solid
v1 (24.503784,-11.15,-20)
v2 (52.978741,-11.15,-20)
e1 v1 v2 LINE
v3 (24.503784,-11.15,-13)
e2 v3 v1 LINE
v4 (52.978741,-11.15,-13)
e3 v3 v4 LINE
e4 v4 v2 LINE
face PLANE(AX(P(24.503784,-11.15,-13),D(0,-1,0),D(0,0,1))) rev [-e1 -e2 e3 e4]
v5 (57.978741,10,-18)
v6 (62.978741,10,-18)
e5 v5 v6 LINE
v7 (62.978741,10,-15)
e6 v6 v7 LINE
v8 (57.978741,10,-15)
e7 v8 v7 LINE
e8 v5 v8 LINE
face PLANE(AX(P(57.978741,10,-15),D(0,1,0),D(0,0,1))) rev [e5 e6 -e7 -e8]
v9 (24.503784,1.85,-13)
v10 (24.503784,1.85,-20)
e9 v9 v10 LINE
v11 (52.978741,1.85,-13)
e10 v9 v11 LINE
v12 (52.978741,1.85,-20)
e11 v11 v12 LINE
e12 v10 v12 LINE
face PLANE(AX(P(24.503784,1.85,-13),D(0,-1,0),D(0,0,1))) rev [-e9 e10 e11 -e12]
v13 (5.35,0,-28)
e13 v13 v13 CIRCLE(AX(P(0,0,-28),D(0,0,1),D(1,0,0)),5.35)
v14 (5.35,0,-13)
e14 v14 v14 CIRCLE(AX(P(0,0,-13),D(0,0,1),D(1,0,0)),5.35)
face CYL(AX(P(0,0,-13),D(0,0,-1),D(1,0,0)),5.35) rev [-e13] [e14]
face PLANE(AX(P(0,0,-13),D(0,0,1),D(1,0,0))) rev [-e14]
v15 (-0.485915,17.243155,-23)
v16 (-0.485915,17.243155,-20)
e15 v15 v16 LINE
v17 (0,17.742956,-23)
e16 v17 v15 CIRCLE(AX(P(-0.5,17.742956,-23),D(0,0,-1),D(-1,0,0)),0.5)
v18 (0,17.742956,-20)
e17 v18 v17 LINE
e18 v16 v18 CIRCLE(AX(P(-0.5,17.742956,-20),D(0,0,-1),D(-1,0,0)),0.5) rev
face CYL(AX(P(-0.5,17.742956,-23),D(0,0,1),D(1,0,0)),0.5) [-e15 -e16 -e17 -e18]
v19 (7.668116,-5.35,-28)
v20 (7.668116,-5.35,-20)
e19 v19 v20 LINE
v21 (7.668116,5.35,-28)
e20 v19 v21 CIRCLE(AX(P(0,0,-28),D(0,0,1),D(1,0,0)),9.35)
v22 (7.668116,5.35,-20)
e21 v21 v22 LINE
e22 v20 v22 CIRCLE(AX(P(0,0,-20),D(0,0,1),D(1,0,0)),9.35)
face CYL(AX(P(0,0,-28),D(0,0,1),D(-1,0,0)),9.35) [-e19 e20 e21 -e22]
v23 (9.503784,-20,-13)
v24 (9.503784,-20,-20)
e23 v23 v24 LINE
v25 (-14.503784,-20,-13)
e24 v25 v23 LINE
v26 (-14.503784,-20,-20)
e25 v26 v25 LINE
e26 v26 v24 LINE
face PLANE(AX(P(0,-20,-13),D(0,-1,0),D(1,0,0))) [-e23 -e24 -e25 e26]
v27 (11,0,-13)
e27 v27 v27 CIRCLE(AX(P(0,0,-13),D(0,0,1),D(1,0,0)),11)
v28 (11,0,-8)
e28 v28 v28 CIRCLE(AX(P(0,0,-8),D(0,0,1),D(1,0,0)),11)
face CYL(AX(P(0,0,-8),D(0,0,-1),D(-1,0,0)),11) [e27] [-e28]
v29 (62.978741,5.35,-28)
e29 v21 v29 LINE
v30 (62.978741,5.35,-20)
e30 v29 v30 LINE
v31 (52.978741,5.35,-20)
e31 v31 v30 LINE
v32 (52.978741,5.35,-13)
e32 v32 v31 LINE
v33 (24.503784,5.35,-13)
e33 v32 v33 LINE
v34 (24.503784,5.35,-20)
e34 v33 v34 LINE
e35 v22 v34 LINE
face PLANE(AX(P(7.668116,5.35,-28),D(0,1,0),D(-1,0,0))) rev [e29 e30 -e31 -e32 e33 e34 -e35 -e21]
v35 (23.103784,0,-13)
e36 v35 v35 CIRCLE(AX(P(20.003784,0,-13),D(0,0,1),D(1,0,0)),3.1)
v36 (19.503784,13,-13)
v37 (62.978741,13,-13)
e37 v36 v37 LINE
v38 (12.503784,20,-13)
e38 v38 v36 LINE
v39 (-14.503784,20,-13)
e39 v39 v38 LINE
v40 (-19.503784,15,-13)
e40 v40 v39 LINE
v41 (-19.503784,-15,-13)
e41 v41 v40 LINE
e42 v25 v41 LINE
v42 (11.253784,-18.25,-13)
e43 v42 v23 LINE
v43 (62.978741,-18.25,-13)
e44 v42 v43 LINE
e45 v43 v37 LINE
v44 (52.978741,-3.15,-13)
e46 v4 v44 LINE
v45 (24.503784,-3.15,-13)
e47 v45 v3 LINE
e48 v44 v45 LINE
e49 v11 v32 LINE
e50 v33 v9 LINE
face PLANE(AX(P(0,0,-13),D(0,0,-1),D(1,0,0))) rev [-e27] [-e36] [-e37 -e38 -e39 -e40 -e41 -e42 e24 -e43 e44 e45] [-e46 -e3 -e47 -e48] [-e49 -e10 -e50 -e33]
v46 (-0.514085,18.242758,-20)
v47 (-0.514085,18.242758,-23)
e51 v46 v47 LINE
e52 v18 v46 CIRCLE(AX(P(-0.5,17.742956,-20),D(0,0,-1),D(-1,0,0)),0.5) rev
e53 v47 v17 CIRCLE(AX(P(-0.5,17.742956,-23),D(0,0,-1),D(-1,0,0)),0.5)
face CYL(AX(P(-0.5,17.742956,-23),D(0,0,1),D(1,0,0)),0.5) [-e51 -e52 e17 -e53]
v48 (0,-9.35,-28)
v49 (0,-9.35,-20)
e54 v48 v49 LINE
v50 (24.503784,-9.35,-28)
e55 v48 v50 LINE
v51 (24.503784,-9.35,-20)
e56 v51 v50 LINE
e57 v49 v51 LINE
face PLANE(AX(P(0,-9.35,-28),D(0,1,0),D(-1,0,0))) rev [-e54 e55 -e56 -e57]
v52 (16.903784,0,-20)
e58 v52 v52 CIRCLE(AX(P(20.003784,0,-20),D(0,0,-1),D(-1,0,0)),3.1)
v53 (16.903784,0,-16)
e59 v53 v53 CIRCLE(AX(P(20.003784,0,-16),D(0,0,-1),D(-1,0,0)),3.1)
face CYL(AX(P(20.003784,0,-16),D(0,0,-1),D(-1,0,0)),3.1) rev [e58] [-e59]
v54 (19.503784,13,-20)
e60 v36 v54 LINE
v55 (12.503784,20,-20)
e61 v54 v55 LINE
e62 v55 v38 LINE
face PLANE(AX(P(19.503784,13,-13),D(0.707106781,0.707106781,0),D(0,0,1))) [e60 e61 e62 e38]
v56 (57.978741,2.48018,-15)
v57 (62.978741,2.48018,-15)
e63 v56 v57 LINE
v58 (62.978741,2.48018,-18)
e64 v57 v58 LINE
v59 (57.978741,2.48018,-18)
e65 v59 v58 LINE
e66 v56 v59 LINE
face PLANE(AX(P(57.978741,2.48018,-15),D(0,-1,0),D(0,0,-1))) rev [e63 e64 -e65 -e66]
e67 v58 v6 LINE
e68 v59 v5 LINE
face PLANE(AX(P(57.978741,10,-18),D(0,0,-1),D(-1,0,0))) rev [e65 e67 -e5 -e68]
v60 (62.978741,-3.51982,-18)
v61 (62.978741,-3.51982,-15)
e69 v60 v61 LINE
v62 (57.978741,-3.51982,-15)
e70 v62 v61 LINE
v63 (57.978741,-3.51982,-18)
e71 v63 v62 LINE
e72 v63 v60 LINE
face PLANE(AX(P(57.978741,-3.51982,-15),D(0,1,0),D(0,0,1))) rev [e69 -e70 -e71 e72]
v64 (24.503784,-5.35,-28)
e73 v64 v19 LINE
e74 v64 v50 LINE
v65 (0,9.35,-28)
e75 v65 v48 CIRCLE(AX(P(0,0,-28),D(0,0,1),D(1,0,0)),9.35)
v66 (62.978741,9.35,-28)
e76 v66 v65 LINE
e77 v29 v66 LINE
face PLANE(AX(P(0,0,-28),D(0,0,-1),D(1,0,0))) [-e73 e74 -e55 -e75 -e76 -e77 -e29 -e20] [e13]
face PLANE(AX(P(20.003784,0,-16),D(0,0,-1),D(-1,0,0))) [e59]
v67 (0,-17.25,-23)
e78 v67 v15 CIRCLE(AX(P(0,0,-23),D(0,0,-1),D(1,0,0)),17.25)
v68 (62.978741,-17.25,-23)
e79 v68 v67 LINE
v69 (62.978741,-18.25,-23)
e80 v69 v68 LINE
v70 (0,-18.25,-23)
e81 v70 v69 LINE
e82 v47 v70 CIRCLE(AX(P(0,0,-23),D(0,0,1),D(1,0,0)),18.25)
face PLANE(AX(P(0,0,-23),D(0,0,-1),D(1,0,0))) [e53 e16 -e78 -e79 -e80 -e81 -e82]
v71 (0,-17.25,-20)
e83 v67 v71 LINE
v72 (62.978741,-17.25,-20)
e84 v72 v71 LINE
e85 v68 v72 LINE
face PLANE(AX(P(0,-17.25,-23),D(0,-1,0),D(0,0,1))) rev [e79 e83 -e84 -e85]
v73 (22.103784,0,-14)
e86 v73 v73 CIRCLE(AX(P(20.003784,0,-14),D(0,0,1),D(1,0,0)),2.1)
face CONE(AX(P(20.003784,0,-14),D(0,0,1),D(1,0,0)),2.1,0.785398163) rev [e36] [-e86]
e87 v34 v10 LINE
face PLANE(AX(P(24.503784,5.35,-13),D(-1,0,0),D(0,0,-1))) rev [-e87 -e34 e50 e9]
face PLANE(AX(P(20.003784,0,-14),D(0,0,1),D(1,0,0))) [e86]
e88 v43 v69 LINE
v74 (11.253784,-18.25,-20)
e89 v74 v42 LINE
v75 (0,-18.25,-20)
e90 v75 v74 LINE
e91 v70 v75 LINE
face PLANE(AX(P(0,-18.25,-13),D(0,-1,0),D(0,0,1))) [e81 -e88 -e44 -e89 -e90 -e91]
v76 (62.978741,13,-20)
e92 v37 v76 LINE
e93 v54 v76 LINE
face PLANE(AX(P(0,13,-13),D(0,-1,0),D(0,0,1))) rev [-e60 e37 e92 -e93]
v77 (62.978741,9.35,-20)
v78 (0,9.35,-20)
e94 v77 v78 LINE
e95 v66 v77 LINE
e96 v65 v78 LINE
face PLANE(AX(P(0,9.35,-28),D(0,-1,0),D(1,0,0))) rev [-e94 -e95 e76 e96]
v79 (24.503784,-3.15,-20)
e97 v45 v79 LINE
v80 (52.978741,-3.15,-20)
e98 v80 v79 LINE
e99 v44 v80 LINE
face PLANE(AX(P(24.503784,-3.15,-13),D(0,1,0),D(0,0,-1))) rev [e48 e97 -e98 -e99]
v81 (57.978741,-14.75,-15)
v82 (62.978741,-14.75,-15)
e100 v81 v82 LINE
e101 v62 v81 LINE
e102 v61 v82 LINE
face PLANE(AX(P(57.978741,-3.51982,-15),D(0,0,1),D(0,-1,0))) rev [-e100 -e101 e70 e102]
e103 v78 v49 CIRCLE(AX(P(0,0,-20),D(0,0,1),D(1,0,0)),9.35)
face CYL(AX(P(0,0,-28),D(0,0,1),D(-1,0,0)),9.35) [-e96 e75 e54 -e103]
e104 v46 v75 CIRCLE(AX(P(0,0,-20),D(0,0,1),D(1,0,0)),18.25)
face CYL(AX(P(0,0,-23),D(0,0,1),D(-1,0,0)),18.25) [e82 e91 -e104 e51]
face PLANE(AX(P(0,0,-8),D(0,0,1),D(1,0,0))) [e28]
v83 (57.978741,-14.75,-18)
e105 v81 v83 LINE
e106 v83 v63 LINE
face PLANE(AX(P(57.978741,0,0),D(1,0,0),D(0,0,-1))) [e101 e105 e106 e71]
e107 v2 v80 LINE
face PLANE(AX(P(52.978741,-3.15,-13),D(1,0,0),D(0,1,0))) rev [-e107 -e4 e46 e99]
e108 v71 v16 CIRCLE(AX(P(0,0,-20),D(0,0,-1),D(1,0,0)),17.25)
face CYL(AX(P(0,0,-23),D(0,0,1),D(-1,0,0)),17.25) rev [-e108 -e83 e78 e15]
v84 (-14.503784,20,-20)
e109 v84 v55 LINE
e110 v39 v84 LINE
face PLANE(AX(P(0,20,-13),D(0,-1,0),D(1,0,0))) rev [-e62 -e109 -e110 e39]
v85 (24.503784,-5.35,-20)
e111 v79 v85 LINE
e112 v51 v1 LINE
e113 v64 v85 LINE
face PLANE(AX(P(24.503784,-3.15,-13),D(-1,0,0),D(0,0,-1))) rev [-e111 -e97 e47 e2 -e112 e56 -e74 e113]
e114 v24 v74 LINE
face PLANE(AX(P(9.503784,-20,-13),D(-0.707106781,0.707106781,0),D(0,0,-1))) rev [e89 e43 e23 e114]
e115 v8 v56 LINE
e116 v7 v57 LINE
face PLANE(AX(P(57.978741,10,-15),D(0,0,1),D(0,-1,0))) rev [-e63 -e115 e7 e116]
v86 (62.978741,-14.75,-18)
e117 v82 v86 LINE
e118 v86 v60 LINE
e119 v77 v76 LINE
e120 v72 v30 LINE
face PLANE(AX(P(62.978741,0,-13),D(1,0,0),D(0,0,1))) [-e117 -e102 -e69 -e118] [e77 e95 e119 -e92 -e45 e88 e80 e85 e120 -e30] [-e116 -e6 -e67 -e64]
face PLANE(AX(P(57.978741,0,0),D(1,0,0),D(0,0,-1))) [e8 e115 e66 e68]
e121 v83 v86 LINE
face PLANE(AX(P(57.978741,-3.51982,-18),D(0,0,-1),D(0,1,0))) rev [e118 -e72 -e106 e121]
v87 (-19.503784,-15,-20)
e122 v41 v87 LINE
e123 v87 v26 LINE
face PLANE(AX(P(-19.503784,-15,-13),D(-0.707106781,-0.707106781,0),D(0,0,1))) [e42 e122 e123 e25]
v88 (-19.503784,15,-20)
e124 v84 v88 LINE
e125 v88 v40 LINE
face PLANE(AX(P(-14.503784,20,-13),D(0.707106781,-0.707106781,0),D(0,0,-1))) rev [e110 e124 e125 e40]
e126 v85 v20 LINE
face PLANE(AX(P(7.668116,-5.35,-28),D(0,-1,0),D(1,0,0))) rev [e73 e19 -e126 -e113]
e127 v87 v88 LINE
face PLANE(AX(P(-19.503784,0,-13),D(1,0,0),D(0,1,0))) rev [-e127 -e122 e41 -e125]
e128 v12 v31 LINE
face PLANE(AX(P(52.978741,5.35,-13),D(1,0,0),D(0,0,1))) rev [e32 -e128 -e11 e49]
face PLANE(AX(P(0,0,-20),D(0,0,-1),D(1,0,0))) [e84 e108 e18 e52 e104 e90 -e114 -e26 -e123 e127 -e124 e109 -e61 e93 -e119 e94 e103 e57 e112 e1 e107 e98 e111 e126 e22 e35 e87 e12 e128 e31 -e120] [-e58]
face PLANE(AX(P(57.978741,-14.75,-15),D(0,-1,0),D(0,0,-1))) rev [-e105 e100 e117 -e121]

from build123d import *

# Parameters (mm, degrees)
SKETCH1_R               = 5.35
BOSS_EXTRUDE2_DEPTH     = 7
BOSS_EXTRUDE3_START     = 8
SKETCH3_R               = 5.35
BOSS_EXTRUDE3_DEPTH     = 8
BOSS_EXTRUDE4_DEPTH     = 3
CHAMFER1_SIZE           = 10
CHAMFER2_SIZE           = 5
CUT_EXTRUDE1_DEPTH      = 67.560662475
CUT_EXTRUDE1_DEPTH_BACK = 67.560662475
SKETCH5_W               = 28.474956737
SKETCH5_H               = 3.5
SKETCH5_H_2             = 8
CHAMFER3_SIZE           = 7
SKETCH6_R               = 11
BOSS_EXTRUDE5_DEPTH     = 5
SKETCH8_W               = 3
SKETCH8_H               = 7.519820499
SKETCH8_H_2             = 11.230179501
CUT_EXTRUDE2_DEPTH      = 5
CUT_EXTRUDE3_REACH      = 91.372
SKETCH9_W               = 8
SKETCH9_H               = 4
SKETCH10_R              = 3.1
CUT_EXTRUDE4_DEPTH      = 4
SKETCH11_R              = 3.1
CUT_EXTRUDE5_DEPTH      = 1
CHAMFER4_SIZE           = 1
FILLET1_R               = 0.5


# Some blends are built 0.0001 mm under size
with BuildPart() as part:
    # Sketch1 → Boss-Extrude2 (new body)
    with BuildSketch(Plane.XY):
        Polygon((-19.503784034, -20), (19.503784034, -20), (19.503784034, -18.25), (62.978740771, -18.25), (62.978740771, 13), (19.503784034, 13), (19.503784034, 20), (-19.503784034, 20), align=None)
        Circle(SKETCH1_R, mode=Mode.SUBTRACT)
    extrude(amount=-BOSS_EXTRUDE2_DEPTH)

    # Sketch3 → Boss-Extrude3 (add)
    with BuildSketch(Plane.XY.offset(BOSS_EXTRUDE3_START)):
        with BuildLine():
            Line((7.668115805, 5.35), (62.978740771, 5.35))
            Line((62.978740771, 5.35), (62.978740771, 9.35))
            Line((62.978740771, 9.35), (0, 9.35))
            ThreePointArc((0, 9.35), (-9.35, 0), (0, -9.35))
            Line((0, -9.35), (62.978740771, -9.35))
            Line((62.978740771, -9.35), (62.978740771, -5.35))
            Line((62.978740771, -5.35), (7.668115805, -5.35))
            ThreePointArc((7.668115805, -5.35), (9.35, 0), (7.668115805, 5.35))
        make_face()
        Circle(SKETCH3_R, mode=Mode.SUBTRACT)
    extrude(amount=-BOSS_EXTRUDE3_DEPTH)

    # Sketch4 → Boss-Extrude4 (add)
    with BuildSketch(Plane.XY):
        with BuildLine():
            Line((0, -18.25), (62.978740771, -18.25))
            Line((62.978740771, -18.25), (62.978740771, -17.25))
            Line((62.978740771, -17.25), (8.306623863, -17.25))
            Line((8.306623863, -17.25), (0, -17.25))
            ThreePointArc((0, -17.25), (-17.25, 0), (0, 17.25))
            Line((0, 17.25), (0, 18.25))
            ThreePointArc((0, 18.25), (-18.25, 0), (0, -18.25))
        make_face()
    extrude(amount=BOSS_EXTRUDE4_DEPTH)

    # Chamfer1
    # the kernel refuses this chamfer: 10 mm, written as the material it takes off along each edge
    with BuildSketch(Plane(origin=(19.503784034, -20, 25.71682988), x_dir=(-0.9996219169112968, -0.027495876610586317, 0), z_dir=(0, 0, -1))) as chamfer1_piece_1_section:
        Polygon((CHAMFER1_SIZE * 0.999621916911, CHAMFER1_SIZE * 0.0274958766106), (-CHAMFER1_SIZE * 0.0274958766106, CHAMFER1_SIZE * 0.999621916911), (0, 0), align=None)
    chamfer1_piece_1 = extrude(amount=58.433659759, mode=Mode.PRIVATE)
    chamfer1_piece_1 = split(chamfer1_piece_1, bisect_by=Plane(origin=(14.814200223, -18.25, -3.5), z_dir=(0, -1, 0)), keep=Keep.TOP, mode=Mode.PRIVATE)
    add(chamfer1_piece_1, mode=Mode.SUBTRACT)

    # Chamfer2
    chamfer2_edges = [part.edges().sort_by_distance(p)[0] for p in [
        (-19.503784034, -20, -3.5),
        (-19.503784034, 20, -3.5),
    ]]
    chamfer(chamfer2_edges, length=CHAMFER2_SIZE)

    # Sketch5 → Cut-Extrude1 (cut, two sides: drawn at the far end of the back side and taken through both)
    with BuildSketch(Plane.XY.offset(-CUT_EXTRUDE1_DEPTH_BACK)):
        with Locations((38.741262403, 3.6)):
            Rectangle(SKETCH5_W, SKETCH5_H)
        with Locations((38.741262403, -7.15)):
            Rectangle(SKETCH5_W, SKETCH5_H_2)
    extrude(amount=CUT_EXTRUDE1_DEPTH + CUT_EXTRUDE1_DEPTH_BACK, mode=Mode.SUBTRACT)

    # Chamfer3
    chamfer3_edges = [part.edges().sort_by_distance(p)[0] for p in [
        (19.503784034, 20, -3.5),
    ]]
    chamfer(chamfer3_edges, length=CHAMFER3_SIZE - 0.0001)  # a hair under: the kernel refuses the full size


with BuildPart() as body_2:
    # Mirror9: mirrored copy
    add(part.part.mirror(Plane.XY.offset(-10)))

    # Sketch6 → Boss-Extrude5 (add)
    with BuildSketch(Plane.XY.offset(-13)):
        Circle(SKETCH6_R)
    extrude(amount=BOSS_EXTRUDE5_DEPTH)

    # Sketch8 → Cut-Extrude2 (cut)
    with BuildSketch(Plane(origin=(62.978740771, 0, 0), x_dir=(0, 0, -1), z_dir=(1, 0, 0))):
        with Locations((16.5, 6.240089751)):
            Rectangle(SKETCH8_W, SKETCH8_H)
        with Locations((16.5, -9.13491025)):
            Rectangle(SKETCH8_W, SKETCH8_H_2)
    extrude(amount=-CUT_EXTRUDE2_DEPTH, mode=Mode.SUBTRACT)

    # Sketch9 → Cut-Extrude3 (cut, up to next)
    with BuildSketch(Plane(origin=(62.978740771, 0, 0), x_dir=(0, 0, -1), z_dir=(1, 0, 0)), mode=Mode.PRIVATE) as cut_extrude3_sk1:
        with Locations((24, -7.35)):
            Rectangle(SKETCH9_W, SKETCH9_H)
    cut_extrude3_tool1 = extrude(cut_extrude3_sk1.sketch, amount=-CUT_EXTRUDE3_REACH, mode=Mode.PRIVATE) & body_2.part
    add(cut_extrude3_tool1.solids().sort_by_distance((62.978741, -7.35, -24))[0], mode=Mode.SUBTRACT)

    # Sketch10 → Cut-Extrude4 (cut)
    with BuildSketch(Plane(origin=(0, 0, -20), x_dir=(-1, 0, 0), z_dir=(0, 0, -1))):
        with Locations((-20.003784034, 0)):
            Circle(SKETCH10_R)
    extrude(amount=-CUT_EXTRUDE4_DEPTH, mode=Mode.SUBTRACT)

    # Sketch11 → Cut-Extrude5 (cut)
    with BuildSketch(Plane.XY.offset(-13)):
        with Locations(Location((20.003784034, 0, 0), (0, 0, 180))):
            Circle(SKETCH11_R)
    extrude(amount=-CUT_EXTRUDE5_DEPTH, mode=Mode.SUBTRACT)

    # Chamfer4
    chamfer4_edges = [body_2.edges().sort_by_distance(p)[0] for p in [
        (23.103784034, 0, -14),
    ]]
    chamfer(chamfer4_edges, length=CHAMFER4_SIZE - 0.0001)  # a hair under: the kernel refuses the full size

    # Fillet1
    fillet1_edges = [body_2.edges().sort_by_distance(p)[0] for p in [
        (0, 18.25, -21.5),
        (0, 17.25, -21.5),
    ]]
    fillet(fillet1_edges, radius=FILLET1_R - 0.0001)  # a hair under: the kernel refuses the full size


solid = body_2.part
